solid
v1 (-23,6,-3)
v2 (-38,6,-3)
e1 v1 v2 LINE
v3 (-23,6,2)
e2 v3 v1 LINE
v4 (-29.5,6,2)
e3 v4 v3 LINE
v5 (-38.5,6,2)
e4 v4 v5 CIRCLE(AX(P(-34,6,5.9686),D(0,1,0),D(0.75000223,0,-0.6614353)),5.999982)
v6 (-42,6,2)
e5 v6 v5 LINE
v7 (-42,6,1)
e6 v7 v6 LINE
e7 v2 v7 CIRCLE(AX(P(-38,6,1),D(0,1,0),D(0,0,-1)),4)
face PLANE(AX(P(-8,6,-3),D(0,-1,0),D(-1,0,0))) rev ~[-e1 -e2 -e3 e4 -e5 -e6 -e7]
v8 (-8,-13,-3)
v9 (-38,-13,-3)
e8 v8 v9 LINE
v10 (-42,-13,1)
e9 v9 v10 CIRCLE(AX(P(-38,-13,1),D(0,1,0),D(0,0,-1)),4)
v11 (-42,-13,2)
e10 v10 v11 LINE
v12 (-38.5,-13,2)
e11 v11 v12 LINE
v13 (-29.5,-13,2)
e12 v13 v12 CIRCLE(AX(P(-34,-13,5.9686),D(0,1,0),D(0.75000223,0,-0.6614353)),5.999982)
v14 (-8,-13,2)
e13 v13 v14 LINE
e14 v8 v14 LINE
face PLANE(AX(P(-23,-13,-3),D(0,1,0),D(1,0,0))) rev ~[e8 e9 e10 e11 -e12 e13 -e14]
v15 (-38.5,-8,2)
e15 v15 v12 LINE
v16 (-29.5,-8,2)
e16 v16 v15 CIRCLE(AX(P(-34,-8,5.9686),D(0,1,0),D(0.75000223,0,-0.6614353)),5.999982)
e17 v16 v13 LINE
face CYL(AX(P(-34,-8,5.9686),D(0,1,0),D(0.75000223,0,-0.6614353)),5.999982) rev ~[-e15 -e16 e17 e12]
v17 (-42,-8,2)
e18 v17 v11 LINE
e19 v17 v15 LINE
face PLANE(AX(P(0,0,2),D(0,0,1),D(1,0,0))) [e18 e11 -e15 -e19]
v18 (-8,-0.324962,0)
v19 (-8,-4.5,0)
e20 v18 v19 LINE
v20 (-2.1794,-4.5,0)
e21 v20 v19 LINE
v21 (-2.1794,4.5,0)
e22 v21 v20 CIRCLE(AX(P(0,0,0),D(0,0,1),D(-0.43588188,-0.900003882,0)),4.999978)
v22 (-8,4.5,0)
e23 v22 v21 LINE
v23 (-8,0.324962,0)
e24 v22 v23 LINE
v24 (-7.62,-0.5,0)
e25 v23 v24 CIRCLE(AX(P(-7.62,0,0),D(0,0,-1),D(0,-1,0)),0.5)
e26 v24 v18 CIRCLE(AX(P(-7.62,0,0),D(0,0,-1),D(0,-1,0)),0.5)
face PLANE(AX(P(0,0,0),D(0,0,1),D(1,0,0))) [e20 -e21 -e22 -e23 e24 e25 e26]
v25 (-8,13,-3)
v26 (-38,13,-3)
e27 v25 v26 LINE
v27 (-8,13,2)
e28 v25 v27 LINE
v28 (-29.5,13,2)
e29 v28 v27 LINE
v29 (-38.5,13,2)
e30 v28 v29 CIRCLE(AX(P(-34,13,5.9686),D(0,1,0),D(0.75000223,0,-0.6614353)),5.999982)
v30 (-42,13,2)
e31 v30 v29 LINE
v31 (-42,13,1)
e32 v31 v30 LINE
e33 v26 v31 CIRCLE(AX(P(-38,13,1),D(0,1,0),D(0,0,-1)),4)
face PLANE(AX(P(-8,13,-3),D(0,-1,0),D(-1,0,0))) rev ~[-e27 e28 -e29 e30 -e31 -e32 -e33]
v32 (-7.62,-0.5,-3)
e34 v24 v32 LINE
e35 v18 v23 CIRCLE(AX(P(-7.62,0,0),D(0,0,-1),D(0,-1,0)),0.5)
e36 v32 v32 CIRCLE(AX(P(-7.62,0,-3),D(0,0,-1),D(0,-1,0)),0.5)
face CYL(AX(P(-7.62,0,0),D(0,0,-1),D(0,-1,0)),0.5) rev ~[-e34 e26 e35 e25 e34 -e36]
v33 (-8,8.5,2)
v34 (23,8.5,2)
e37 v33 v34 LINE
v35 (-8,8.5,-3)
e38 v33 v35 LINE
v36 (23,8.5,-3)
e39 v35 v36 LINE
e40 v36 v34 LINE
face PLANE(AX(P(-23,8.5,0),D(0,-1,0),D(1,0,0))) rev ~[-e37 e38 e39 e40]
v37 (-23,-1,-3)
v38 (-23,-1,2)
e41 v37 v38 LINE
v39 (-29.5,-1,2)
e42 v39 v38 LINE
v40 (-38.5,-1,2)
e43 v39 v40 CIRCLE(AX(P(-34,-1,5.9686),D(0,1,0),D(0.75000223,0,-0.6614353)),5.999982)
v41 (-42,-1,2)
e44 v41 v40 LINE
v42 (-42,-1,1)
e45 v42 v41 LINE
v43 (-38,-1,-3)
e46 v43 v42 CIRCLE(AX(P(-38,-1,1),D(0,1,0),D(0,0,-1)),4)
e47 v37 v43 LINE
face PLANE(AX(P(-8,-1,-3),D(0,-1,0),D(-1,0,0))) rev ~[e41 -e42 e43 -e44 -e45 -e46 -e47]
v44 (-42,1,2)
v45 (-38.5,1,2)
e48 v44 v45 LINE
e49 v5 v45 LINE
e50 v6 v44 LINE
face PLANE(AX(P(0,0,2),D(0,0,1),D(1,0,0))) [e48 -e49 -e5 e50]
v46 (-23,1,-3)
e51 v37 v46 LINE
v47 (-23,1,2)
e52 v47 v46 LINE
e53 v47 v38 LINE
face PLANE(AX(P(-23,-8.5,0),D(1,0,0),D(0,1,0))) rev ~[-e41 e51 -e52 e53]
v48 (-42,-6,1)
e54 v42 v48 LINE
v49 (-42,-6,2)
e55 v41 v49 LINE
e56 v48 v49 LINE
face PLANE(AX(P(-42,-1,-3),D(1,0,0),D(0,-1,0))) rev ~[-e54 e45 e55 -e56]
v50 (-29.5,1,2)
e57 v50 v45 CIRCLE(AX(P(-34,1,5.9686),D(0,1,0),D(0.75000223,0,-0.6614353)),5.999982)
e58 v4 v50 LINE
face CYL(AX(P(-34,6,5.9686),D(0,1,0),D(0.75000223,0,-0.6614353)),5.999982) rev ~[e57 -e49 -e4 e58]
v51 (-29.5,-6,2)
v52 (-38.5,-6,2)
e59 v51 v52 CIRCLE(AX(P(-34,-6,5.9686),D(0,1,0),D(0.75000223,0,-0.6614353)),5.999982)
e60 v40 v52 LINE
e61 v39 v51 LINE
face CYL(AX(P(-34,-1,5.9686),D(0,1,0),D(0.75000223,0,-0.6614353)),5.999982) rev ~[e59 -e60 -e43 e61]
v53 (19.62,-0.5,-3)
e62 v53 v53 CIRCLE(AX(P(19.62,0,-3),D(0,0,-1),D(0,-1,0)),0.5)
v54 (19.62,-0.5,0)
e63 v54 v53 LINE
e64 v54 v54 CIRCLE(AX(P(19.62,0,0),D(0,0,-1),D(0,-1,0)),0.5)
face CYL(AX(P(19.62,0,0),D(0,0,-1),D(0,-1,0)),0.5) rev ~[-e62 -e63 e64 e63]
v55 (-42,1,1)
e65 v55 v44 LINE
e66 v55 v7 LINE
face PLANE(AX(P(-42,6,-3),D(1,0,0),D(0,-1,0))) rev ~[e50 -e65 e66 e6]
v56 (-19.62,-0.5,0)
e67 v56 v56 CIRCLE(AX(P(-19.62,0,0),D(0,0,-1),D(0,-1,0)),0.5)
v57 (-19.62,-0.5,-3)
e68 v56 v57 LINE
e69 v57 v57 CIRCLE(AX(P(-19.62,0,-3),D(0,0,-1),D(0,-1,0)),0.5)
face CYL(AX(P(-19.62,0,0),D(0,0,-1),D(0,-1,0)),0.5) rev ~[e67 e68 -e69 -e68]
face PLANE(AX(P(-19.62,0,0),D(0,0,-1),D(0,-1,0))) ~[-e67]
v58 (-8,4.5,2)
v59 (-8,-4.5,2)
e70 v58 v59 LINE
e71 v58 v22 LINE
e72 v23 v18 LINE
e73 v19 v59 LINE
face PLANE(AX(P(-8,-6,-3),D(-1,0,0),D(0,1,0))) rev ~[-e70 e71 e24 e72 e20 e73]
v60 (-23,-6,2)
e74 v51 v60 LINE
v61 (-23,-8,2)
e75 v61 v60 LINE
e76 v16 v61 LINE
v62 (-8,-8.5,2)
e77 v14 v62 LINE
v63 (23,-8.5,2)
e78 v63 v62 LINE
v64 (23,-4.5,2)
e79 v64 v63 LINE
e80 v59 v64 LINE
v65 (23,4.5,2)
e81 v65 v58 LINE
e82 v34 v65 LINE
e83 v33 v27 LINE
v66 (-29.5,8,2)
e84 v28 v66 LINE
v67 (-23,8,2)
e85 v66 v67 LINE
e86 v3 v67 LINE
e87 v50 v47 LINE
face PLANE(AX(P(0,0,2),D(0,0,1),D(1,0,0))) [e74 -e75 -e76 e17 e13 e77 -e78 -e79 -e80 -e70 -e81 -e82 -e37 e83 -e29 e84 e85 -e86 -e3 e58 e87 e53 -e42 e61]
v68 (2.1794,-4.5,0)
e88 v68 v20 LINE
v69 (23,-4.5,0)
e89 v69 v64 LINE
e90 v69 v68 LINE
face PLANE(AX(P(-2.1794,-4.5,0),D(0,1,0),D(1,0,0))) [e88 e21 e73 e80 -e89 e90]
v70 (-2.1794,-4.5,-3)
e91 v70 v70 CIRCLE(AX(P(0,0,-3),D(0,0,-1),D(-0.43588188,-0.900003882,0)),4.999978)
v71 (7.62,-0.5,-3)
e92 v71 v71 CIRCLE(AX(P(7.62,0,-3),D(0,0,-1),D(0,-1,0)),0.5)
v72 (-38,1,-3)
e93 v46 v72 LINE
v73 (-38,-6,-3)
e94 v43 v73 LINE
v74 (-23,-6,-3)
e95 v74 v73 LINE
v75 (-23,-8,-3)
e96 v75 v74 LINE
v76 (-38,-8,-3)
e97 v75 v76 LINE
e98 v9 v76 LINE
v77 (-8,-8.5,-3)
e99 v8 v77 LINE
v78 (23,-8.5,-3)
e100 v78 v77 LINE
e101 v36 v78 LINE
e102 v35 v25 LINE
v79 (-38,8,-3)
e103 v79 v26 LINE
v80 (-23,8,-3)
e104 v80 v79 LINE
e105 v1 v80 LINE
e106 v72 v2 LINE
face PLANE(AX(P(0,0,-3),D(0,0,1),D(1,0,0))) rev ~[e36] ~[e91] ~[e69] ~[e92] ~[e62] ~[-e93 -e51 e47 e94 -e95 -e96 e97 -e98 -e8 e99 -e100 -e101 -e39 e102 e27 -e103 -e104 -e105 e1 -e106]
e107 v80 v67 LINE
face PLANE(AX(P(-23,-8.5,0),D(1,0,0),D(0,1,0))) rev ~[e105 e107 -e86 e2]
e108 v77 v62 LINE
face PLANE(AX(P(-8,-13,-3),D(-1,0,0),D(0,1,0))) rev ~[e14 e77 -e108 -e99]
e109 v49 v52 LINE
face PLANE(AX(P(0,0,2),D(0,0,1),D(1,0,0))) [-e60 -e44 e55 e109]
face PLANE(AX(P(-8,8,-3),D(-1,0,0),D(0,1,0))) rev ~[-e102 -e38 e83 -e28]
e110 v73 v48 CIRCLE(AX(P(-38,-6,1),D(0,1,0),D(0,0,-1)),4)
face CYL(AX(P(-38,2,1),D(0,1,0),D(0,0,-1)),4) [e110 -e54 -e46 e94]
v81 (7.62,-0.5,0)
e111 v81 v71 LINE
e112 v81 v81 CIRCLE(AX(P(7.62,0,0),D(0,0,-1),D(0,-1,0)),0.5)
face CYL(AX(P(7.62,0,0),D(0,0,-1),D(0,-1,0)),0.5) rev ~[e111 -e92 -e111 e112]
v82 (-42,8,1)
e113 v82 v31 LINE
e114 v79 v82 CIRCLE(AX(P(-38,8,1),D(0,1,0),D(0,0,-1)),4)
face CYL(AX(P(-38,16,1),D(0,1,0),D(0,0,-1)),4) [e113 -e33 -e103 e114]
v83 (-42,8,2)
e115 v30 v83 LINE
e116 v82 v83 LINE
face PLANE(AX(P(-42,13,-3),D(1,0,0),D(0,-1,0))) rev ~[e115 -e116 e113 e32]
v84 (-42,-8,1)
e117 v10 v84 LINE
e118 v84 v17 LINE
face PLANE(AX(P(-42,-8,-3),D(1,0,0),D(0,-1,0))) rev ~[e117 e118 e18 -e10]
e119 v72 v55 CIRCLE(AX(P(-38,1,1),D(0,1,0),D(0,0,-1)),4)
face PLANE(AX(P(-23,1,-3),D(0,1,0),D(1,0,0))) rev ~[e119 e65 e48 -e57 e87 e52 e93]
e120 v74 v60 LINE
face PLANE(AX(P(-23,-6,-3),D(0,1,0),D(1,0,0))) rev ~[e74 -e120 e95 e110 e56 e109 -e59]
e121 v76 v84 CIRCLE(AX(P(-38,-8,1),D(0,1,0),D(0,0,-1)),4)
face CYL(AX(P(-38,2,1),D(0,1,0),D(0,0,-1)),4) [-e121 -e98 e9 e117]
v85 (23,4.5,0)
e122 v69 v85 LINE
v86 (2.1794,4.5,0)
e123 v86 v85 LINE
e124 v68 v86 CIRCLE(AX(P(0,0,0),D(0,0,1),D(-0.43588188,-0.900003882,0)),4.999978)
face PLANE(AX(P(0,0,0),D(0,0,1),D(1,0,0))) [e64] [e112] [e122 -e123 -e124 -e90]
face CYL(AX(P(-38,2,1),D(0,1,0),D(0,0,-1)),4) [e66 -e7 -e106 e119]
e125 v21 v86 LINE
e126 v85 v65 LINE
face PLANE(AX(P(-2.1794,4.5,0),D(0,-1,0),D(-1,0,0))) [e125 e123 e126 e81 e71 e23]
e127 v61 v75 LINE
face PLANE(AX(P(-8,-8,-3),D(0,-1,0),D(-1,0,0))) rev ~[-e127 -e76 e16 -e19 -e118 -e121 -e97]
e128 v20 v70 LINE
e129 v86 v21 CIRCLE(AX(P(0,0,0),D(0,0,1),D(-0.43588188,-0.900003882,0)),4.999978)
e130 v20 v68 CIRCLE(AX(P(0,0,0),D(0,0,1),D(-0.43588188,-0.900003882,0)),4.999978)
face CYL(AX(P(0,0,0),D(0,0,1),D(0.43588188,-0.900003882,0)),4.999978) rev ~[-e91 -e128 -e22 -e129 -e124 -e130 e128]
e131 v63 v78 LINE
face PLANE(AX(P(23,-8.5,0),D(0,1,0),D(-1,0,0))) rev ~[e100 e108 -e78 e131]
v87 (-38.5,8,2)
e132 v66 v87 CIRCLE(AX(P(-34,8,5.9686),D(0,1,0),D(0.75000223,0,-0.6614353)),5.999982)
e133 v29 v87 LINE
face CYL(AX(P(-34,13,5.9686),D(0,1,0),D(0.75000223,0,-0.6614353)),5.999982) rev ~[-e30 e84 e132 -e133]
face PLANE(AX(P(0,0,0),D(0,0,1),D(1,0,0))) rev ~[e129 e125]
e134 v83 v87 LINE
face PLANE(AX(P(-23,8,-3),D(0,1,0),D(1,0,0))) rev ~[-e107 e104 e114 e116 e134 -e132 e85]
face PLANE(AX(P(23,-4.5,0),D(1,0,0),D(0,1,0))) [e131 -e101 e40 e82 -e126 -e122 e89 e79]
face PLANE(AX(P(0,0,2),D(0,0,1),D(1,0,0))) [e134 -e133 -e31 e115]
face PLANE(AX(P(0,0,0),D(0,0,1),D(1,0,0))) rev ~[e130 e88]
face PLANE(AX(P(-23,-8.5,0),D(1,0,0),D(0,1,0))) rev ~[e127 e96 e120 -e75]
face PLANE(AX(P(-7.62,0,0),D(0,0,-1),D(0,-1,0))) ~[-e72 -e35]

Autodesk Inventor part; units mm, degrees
ref_plane "YZ Plane" through (0, 0, 0) normal (1, 0, 0) x (0, 1, 0)
ref_plane "XZ Plane" through (0, 0, 0) normal (0, 1, 0) x (-1, 0, 0)
ref_plane "XY Plane" through (0, 0, 0) normal (0, 0, 1) x (1, 0, 0)
sketch "Sketch1" plane through (0, 0, 0) normal (0, 0, 1) x (1, 0, 0)
  arc A0 (2.1794, -4.5) -> (2.1794, 4.5) centre (0, 0) ccw
  line L0 (-23, -4.5) -> (-2.1794, -4.5)
  line L1 (23, -4.5) -> (23, 4.5)
  line L2 (23, 4.5) -> (2.1794, 4.5)
  line L3 (-23, 4.5) -> (-23, -4.5)
  line L4 (-23, -4.5) -> (23, 4.5) construction
  line L5 (23, -4.5) -> (-23, 4.5) construction
  line L6 (0, 0) -> (23, 0) construction
  line L7 (0, 0) -> (0, 4.5) construction
  line L8 (23, -8.5) -> (-23, -8.5)
  line L9 (-23, -8.5) -> (-23, 8.5)
  line L10 (-23, 8.5) -> (23, 8.5)
  line L11 (23, 8.5) -> (23, -8.5)
  line L12 (23, -8.5) -> (-23, 8.5) construction
  line L13 (-23, -8.5) -> (23, 8.5) construction
  line L14 (-2.1794, 4.5) -> (-23, 4.5)
  line L15 (2.1794, 4.5) -> (-2.1794, 4.5)
  line L16 (-2.1794, -4.5) -> (2.1794, -4.5)
  line L17 (2.1794, -4.5) -> (23, -4.5)
  arc A1 (-2.1794, -4.5) -> (2.1794, -4.5) centre (0, 0) ccw
  arc A2 (2.1794, 4.5) -> (-2.1794, 4.5) centre (0, 0) ccw
  arc A3 (-2.1794, 4.5) -> (-2.1794, -4.5) centre (0, 0) ccw
  point P0 (7.62, 0)
  point P1 (19.62, 0)
  point P2 (-7.62, 0)
  point P3 (-19.62, 0)
  point P4 (20, 0)
  dimension "d0" = 10
  dimension "d1" = 46
  dimension "d2" = 9
  dimension "d3" = 7.62
  dimension "d4" = 12
  dimension "d5" = 4
extrude "Extrusion1" add sketch "Sketch1" against normal blind 3 contours A0 L2 L1 L17 | L17 L11 L8 L9 L0 A1 | A2 L14 L9 L10 L11 L2 | L0 L3 L14 A3
extrude "Extrusion2" add sketch "Sketch1" along normal blind 2 contours A1 L16 | L17 L11 L8 L9 L0 A1 | A2 L14 L9 L10 L11 L2 | L15 A2
sketch "Sketch2" plane through (0, 0, -3) normal (0, 0, -1) x (-1, 0, 0)
  circle A0 centre (0, 0) radius 5 projected
  line L0 (8, 6) -> (42, 6)
  line L1 (42, 6) -> (42, 1)
  line L2 (42, 1) -> (8, 1)
  line L3 (8, 1) -> (8, 6)
  line L4 (-23, -8.5) -> (23, -8.5) projected
  line L5 (23, 8.5) -> (-23, 8.5) projected
  line L6 (-23, 8.5) -> (-23, -8.5) projected
  line L7 (8, 8.5) -> (8, -8.5)
  line L8 (23, -8.5) -> (23, 8.5) projected
  line L9 (8, -8.5) -> (23, -8.5)
  line L10 (23, 8.5) -> (23, -8.5)
  line L11 (23, 8.5) -> (8, 8.5)
  dimension "d12" = 8
  dimension "d13" = 34
  dimension "d14" = 5
  dimension "d15" = 1
extrude "Extrusion3" add sketch "Sketch2" against normal up to surface (5 mm away) contours L0 L8 L2 L3 | L0 L1 L2 L8
sketch "Sketch3" plane through (-42, 6, -3) normal (0, 1, 0) x (1, 0, 0)
  line L0 (0, -5) -> (19, -5) projected
  arc A0 (12.5, -5) -> (3.5, -5) centre (8, -8.9686) ccw
  point P0 (42, -3)
  dimension "d33" = 6
  dimension "d35" = 3.5
  dimension "d36" = 9
extrude "Extrusion4" cut sketch "Sketch3" against normal up to next
pattern_linear "Rectangular Pattern1" count 4 spacing 7 along (0, -1, 0) of "Extrusion3", "Extrusion4" first direction both ways yes
extrude "Extrusion5" add sketch "Sketch2" against normal up to surface (5 mm away) contours L7 L5 L8 L0 | L0 L8 L2 L3 | L2 L8 L4 L7
hole "Hole1" at (7.62, 0, 0) at (19.62, 0, 0) at (-19.62, 0, 0) at (-7.62, 0, 0) direction (0, 0, -1) diameter 1 end through all
fillet "Fillet1" radius 4 3 edges at (-42, -10.5, -3) (-42, 3.5, -3) (-42, -3.5, -3)
properties part number "hand1"
